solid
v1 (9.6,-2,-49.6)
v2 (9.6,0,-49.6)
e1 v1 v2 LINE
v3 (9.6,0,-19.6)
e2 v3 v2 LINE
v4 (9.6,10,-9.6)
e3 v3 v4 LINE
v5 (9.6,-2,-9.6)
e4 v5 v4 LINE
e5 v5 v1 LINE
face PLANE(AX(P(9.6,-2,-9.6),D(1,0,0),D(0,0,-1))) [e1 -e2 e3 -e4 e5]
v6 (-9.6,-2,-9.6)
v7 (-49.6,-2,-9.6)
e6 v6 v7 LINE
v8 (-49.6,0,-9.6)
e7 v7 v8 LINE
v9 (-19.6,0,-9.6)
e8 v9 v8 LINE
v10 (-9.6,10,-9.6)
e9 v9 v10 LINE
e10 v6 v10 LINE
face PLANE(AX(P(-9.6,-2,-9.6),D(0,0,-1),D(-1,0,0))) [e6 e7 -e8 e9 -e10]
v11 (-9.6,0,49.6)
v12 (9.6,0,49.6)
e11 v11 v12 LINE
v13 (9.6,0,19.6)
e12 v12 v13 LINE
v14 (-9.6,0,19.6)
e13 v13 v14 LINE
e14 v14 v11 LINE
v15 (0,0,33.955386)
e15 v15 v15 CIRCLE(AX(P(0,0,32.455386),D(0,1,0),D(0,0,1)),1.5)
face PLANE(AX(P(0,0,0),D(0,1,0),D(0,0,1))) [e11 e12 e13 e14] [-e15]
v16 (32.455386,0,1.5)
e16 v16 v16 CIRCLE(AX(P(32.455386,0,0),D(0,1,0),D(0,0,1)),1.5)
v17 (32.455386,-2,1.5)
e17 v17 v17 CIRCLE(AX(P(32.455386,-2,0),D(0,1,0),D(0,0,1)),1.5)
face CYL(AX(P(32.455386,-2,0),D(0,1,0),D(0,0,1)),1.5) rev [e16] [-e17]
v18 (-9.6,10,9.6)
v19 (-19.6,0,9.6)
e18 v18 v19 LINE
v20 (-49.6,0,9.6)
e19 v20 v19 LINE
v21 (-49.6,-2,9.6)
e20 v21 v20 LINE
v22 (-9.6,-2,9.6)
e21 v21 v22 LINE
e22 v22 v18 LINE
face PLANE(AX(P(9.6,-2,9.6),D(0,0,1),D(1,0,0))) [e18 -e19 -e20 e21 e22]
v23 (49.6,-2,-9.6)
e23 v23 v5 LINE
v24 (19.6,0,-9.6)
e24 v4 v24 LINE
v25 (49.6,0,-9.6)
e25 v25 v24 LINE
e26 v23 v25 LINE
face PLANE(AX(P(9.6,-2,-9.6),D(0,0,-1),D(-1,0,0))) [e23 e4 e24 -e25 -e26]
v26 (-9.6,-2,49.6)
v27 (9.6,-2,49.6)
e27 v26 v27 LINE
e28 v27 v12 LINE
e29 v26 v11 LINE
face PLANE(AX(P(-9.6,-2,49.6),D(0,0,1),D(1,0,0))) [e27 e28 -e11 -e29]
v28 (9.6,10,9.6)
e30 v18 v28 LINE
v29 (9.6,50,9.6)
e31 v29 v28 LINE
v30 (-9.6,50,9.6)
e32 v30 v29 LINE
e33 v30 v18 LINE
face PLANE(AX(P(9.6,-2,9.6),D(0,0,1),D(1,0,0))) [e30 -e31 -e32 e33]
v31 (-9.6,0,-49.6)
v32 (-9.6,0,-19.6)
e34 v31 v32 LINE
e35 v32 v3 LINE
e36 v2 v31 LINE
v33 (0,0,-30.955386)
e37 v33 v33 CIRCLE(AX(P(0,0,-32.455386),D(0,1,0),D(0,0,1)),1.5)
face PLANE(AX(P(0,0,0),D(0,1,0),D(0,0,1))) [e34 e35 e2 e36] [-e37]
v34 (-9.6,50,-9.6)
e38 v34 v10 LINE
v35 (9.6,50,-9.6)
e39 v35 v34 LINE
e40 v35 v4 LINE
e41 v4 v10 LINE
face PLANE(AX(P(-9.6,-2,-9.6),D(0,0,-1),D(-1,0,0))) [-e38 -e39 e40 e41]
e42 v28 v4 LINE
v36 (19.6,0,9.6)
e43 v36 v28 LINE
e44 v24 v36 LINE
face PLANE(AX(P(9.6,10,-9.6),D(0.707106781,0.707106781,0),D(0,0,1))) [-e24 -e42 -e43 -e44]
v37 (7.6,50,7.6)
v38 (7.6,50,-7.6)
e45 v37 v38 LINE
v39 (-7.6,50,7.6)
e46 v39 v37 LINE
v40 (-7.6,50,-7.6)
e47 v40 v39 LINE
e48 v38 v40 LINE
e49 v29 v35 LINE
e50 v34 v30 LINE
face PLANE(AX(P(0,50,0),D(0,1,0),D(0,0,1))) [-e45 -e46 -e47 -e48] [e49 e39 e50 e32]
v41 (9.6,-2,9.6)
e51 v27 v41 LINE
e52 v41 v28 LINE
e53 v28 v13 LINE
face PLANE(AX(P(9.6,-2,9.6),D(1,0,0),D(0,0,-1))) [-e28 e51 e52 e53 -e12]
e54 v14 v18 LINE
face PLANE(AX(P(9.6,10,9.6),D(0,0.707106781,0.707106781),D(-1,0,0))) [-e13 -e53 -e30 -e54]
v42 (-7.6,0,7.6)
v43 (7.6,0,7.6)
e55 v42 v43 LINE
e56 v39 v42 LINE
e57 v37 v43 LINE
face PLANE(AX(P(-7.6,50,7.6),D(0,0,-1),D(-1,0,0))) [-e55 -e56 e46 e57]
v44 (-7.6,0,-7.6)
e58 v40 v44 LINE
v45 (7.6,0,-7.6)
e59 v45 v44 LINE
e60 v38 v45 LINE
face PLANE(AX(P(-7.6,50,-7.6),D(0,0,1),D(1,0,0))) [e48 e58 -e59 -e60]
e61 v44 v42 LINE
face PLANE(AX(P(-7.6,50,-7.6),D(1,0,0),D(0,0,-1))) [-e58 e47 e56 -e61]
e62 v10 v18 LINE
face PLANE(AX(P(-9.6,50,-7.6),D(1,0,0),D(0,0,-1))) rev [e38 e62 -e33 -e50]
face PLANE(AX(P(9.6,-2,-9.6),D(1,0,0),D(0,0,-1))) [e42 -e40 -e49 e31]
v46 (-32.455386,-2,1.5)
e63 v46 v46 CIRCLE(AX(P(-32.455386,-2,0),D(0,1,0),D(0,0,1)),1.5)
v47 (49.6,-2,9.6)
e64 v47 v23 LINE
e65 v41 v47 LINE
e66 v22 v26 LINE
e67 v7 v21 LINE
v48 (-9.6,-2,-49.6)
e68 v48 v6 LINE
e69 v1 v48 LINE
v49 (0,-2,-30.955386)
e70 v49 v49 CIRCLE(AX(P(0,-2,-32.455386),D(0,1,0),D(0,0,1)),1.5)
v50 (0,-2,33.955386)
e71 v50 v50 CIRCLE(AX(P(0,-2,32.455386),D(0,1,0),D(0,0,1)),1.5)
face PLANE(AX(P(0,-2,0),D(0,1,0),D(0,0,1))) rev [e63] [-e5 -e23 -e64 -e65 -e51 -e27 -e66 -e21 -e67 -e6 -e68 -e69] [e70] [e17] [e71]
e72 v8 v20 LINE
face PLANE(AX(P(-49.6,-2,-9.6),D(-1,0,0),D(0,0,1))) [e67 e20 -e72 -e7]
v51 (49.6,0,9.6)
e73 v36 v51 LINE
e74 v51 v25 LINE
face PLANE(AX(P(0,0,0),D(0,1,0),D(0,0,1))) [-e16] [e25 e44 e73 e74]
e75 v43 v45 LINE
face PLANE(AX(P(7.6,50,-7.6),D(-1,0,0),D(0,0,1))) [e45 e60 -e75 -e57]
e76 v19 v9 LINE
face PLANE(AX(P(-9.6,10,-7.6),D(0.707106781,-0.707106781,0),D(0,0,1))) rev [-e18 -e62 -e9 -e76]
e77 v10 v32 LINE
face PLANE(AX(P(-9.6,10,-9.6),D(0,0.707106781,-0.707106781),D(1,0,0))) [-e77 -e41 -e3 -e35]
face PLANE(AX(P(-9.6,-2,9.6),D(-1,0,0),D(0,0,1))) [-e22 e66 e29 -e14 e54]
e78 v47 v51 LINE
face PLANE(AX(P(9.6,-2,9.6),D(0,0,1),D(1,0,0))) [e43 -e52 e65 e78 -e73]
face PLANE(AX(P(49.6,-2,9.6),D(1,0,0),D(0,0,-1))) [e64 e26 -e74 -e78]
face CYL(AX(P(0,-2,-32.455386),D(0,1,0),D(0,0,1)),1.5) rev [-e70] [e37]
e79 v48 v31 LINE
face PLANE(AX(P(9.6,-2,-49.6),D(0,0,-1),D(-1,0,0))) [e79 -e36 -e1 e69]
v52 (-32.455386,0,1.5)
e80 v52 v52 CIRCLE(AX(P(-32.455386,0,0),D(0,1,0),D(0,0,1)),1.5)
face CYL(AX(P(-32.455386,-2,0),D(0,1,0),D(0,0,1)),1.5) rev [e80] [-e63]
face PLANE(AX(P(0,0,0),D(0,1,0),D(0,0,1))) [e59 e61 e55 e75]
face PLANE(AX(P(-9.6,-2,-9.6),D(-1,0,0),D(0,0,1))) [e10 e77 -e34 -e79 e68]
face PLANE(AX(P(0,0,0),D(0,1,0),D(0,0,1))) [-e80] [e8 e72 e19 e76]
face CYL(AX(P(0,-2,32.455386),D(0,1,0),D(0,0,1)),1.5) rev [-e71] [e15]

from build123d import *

# Parameters (mm, degrees)
SKETCH1_W           = 19.2
SKETCH1_H           = 19.2
SKETCH1_W_2         = 15.2
SKETCH1_H_2         = 15.2
EXTRUDE_THIN1_DEPTH = 50
BOSS_EXTRUDE1_DEPTH = 2
CHAMFER1_SIZE       = 10
CHAMFER2_SIZE       = 10
CHAMFER3_SIZE       = 10
CHAMFER4_SIZE       = 10
SKETCH6_R           = 1.5
CUT_EXTRUDE1_DEPTH  = 87.141279303


# Some blends are built 0.0001 mm under size
with BuildPart() as part:
    # Sketch1 → Extrude-Thin1 (new body)
    with BuildSketch(Plane(origin=(0, 0, 0), x_dir=(1, 0, 0), z_dir=(0, 1, 0))):
        Rectangle(SKETCH1_W, SKETCH1_H)
        Rectangle(SKETCH1_W_2, SKETCH1_H_2, mode=Mode.SUBTRACT)
    extrude(amount=EXTRUDE_THIN1_DEPTH)

    # Sketch2 → Boss-Extrude1 (add)
    with BuildSketch(Plane(origin=(0, 0, 0), x_dir=(1, 0, 0), z_dir=(0, 1, 0))):
        Polygon((9.6, 9.6), (49.6, 9.6), (49.6, -9.6), (9.6, -9.6), (9.6, -49.6), (-9.6, -49.6), (-9.6, -9.6), (-49.6, -9.6), (-49.6, 9.6), (-9.6, 9.6), (-9.6, 49.6), (9.6, 49.6), align=None)
    extrude(amount=-BOSS_EXTRUDE1_DEPTH)

    # Chamfer1
    # the kernel refuses this chamfer: 10 mm, written as the material it adds along each edge
    with BuildSketch(Plane(origin=(-9.6, 0, 9.6), x_dir=(0, 1, 0), z_dir=(0, 0, -1))) as chamfer1_piece_1:
        Polygon((CHAMFER1_SIZE, 0), (0, -CHAMFER1_SIZE), (0, 0), align=None)
    extrude(amount=19.2)

    # Chamfer2
    # the kernel refuses this chamfer: 10 mm, written as the material it adds along each edge
    with BuildSketch(Plane(origin=(-9.6, 0, -9.6), x_dir=(0, 1, 0), z_dir=(1, 0, 0))) as chamfer2_piece_1:
        Polygon((CHAMFER2_SIZE, 0), (0, -CHAMFER2_SIZE), (0, 0), align=None)
    extrude(amount=19.2)

    # Chamfer3
    # the kernel refuses this chamfer: 10 mm, written as the material it adds along each edge
    with BuildSketch(Plane(origin=(9.6, 0, -9.6), x_dir=(0, 1, 0), z_dir=(0, 0, 1))) as chamfer3_piece_1:
        Polygon((CHAMFER3_SIZE, 0), (0, -CHAMFER3_SIZE), (0, 0), align=None)
    extrude(amount=19.2)

    # Chamfer4
    chamfer4_edges = [part.edges().sort_by_distance(p)[0] for p in [
        (0, 0, 9.6),
    ]]
    chamfer(chamfer4_edges, length=CHAMFER4_SIZE - 0.0001)  # a hair under: the kernel refuses the full size

    # Sketch6 → Cut-Extrude1 (cut, through all)
    with BuildSketch(Plane(origin=(0, 0, 0), x_dir=(1, 0, 0), z_dir=(0, 1, 0))):
        with Locations(Location((0, 32.455385939, 0), (0, 0, 270))):
            Circle(SKETCH6_R)
        with Locations(Location((32.455385939, 0, 0), (0, 0, 270))):
            Circle(SKETCH6_R)
        with Locations(Location((0, -32.455385939, 0), (0, 0, 270))):
            Circle(SKETCH6_R)
        with Locations(Location((-32.455385939, 0, 0), (0, 0, 270))):
            Circle(SKETCH6_R)
    extrude(amount=-CUT_EXTRUDE1_DEPTH, mode=Mode.SUBTRACT)


solid = part.part
